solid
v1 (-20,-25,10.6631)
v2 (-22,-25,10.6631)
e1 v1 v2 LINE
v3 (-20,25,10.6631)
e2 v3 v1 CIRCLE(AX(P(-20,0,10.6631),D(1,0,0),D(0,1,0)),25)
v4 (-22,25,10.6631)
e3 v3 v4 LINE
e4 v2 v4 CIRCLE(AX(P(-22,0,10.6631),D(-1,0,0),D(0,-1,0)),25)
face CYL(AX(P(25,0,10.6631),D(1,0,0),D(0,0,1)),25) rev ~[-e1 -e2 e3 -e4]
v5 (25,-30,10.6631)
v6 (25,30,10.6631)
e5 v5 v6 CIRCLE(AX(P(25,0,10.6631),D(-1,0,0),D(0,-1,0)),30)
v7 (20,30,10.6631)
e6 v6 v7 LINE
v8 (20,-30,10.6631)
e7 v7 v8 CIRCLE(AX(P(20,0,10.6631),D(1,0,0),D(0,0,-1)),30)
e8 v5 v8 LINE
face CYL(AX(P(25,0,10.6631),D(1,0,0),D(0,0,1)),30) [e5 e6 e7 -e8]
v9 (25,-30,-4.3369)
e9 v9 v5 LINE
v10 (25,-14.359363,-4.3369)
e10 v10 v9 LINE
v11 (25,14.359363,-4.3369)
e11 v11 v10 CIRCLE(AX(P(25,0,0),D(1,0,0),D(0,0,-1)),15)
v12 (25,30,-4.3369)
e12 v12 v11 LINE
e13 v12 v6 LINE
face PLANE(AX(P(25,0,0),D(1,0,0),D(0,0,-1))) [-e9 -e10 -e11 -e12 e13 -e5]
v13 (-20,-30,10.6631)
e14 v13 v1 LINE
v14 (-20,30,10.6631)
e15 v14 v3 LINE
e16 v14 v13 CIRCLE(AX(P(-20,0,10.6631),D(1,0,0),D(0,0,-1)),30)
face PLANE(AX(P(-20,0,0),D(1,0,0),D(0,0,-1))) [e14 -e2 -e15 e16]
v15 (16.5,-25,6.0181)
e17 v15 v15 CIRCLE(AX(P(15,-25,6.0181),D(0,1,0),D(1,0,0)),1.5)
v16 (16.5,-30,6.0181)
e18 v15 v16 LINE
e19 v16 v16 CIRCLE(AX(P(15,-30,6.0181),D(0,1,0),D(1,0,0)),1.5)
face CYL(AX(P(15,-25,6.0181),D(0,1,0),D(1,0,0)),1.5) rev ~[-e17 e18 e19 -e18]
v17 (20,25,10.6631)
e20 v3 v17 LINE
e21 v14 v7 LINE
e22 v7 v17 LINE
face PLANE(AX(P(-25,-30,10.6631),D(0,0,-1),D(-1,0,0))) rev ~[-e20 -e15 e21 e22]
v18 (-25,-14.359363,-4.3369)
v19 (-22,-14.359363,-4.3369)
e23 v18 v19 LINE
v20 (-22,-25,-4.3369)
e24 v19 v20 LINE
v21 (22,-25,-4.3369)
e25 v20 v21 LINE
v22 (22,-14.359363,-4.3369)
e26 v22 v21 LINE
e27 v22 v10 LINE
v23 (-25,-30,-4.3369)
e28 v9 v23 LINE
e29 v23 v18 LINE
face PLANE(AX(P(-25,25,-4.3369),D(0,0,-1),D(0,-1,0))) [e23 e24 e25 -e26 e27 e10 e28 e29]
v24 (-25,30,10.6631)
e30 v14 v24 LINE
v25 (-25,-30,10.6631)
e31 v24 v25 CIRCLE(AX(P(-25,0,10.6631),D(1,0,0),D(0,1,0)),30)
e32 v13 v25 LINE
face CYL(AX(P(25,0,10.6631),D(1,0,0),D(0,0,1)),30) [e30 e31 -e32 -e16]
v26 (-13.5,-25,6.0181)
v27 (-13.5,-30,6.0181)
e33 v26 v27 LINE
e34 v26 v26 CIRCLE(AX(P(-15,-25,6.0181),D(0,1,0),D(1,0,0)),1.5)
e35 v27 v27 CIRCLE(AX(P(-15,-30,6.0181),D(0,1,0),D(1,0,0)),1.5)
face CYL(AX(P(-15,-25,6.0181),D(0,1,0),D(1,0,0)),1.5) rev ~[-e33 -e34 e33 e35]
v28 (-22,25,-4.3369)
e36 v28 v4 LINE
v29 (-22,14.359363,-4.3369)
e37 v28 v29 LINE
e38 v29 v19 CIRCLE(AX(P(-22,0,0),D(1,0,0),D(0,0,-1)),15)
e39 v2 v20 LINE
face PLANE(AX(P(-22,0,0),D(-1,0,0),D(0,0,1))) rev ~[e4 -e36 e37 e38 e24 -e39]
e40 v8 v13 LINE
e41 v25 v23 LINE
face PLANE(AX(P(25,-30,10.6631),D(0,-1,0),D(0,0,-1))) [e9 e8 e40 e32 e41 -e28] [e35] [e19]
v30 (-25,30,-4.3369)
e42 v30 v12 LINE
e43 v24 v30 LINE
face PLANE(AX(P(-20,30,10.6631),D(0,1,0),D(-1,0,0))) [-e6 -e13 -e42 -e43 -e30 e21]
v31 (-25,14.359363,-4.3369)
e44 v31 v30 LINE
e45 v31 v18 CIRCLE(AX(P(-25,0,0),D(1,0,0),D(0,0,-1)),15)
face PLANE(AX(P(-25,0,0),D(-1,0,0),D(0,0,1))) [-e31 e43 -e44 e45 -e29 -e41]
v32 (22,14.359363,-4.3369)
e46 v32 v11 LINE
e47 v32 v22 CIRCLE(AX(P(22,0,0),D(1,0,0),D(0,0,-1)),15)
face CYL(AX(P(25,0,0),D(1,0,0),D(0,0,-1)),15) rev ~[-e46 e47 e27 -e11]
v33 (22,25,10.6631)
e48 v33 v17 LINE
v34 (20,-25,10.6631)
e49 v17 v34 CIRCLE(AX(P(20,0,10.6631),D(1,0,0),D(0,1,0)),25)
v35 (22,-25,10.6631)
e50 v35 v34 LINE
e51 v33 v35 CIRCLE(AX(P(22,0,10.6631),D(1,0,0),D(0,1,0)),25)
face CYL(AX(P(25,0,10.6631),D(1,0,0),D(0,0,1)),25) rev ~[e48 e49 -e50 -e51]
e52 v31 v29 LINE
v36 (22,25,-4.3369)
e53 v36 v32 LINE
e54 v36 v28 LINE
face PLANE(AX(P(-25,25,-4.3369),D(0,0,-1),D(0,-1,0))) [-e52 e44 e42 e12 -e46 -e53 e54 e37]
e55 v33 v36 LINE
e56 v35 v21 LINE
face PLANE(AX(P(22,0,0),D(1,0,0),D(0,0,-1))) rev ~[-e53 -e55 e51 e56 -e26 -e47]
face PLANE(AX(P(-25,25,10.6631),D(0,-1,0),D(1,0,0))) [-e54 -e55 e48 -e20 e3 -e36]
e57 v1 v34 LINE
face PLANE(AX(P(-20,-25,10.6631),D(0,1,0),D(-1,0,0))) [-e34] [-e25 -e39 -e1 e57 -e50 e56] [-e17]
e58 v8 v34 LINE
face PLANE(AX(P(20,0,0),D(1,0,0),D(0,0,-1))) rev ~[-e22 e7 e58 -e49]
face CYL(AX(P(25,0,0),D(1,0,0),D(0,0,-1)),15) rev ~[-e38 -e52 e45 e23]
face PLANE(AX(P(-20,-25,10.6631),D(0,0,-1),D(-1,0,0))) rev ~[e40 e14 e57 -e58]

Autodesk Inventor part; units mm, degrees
ref_plane "YZ Plane" through (0, 0, 0) normal (1, 0, 0) x (0, 1, 0)
ref_plane "XZ Plane" through (0, 0, 0) normal (0, 1, 0) x (-1, 0, 0)
sketch "Szkic1" plane through (0, 0, 0) normal (0, 0, 1) x (1, 0, 0)
  line L0 (19.3649, 0) -> (-19.3649, 0)
  line L1 (-19.3649, 0) -> (-103.6215, 0)
  line L2 (-103.6215, 0) -> (-125, 0)
  line L3 (-125, 0) -> (-103.6215, 0)
  line L4 (-103.6215, 0) -> (-19.3649, 0)
  line L5 (-19.3649, 0) -> (19.3649, 0)
  line L6 (19.3649, 0) -> (103.6215, 0)
  line L7 (103.6215, 0) -> (125, 0)
  line L8 (125, 0) -> (103.6215, 0)
  line L9 (103.6215, 0) -> (19.3649, 0)
  line L10 (45, 0) -> (-45, 0)
  line L11 (45, 0) -> (105.3748, 0)
  line L12 (105.3748, 0) -> (130.0712, 0)
  line L13 (130.0712, 0) -> (105.3748, 0)
  line L14 (105.3748, 0) -> (-20.2973, 0)
  line L15 (-20.2973, 0) -> (-105.3748, 0)
  line L16 (-105.3748, 0) -> (-105.3748, 0)
  line L17 (-105.3748, 0) -> (-130.0712, 0)
  line L18 (-130.0712, 0) -> (-105.3748, 0)
  line L19 (-105.3748, 0) -> (-45, 0)
  arc A0 (119.2902, -19.1594) -> (125, 0) centre (90, 0) ccw
  arc A1 (19.3649, -35) -> (103.6215, -25.7743) centre (42.8262, 140.0954) ccw
  arc A2 (103.6215, -25.7743) -> (125, 0) centre (91.4189, 6.1005) ccw
  arc A3 (20.2973, -40.1624) -> (105.3748, -30.457) centre (42.8262, 140.0954) ccw
  arc A4 (105.3748, -30.457) -> (130.0712, 0) centre (91.4189, 6.1005) ccw
  arc A5 (-125, 0) -> (-103.6215, -25.7743) centre (-91.4189, 6.1005) ccw
  arc A6 (-130.0712, 0) -> (-105.3748, -30.457) centre (-91.4189, 6.1005) ccw
  arc A7 (-98.4086, -33.9749) -> (-78.2644, -32.9739) centre (-90, 0) ccw
  arc A8 (-103.6215, -25.7743) -> (-19.3649, -35) centre (-42.8262, 140.0954) ccw
  arc A9 (-19.3649, -35) -> (19.3649, -35) centre (0, 0) ccw
  arc A10 (-20.2973, -40.1624) -> (20.2973, -40.1624) centre (0, 0) ccw
  arc A11 (-105.3748, -30.457) -> (-20.2973, -40.1624) centre (-42.8262, 140.0954) ccw
  line L20 (-105.3748, 0) -> (-20.2973, 0)
  line L21 (19.3649, 0) -> (-19.3649, 0)
  line L22 (130.0712, 0) -> (-130.0712, 0)
  point P0 (0, 0)
  point P1 (-119.2902, -19.1594)
  point P2 (-125, 0)
  point P3 (125, 0)
  dimension "d0" = 70
  dimension "d1" = 70
  dimension "d2" = 250
  dimension "d3" = 90
revolve "Obrót1" add sketch "Szkic1" angle 180 about axis through (130.0712, 0, 0) along (-1, 0, 0) contours L12 A4 A3 A10 A11 A7 A8 A9 A1 A2 | A5 A8 A7 A11 A6 L17
sketch "Szkic2" plane through (0, 0, 0) normal (0, 1, 0) x (-1, 0, 0)
  line L0 (-25, 45) -> (25, 45)
  line L1 (25, 45) -> (25, 15)
  line L2 (25, 15) -> (-25, 15)
  line L3 (-25, 15) -> (-25, 45)
  line L4 (-20.2973, 0) -> (20.2973, 0) projected
  arc A0 (105.3748, 30.457) -> (20.2973, 40.1624) centre (42.8262, -140.0954) ccw projected
  arc A1 (20.2973, 40.1624) -> (-20.2973, 40.1624) centre (0, 0) ccw projected
  point P0 (0, 0)
  point P1 (0, 45)
  point P2 (0, 0)
  point P3 (0, 45)
  dimension "d5" = 50
  dimension "d6" = 30
extrude "Wyciągnięcie proste1" cut sketch "Szkic2" along normal mid plane 91
sketch "Szkic3" plane through (25, 0, 0) normal (-1, 0, 0) x (0, 0, 1)
  point P0 (0, 0)
sketch "Szkic4" plane through (25, 0, 0) normal (-1, 0, 0) x (0, 0, 1)
  arc A0 (15, -37.8222) -> (15, 37.8222) centre (0, 0) ccw projected
  line L0 (15, 37.8222) -> (15, 32.3552) projected
  arc A1 (15, -32.3552) -> (15, 32.3552) centre (0, 0) ccw projected
  line L1 (15, -32.3552) -> (15, -37.8222) projected
  circle A2 centre (10.6631, 0) radius 25
  arc A3 (15, -32.3552) -> (15, 32.3552) centre (0, 0) ccw projected
  circle A4 centre (10.6631, 0) radius 30
  point P0 (0, 0)
  point P1 (35.6631, 0)
  point P2 (22.7682, 27.4494)
  point P3 (22.7682, -27.4494)
  point P4 (35.6631, 0)
  dimension "d9" = 50
  dimension "d19" = 60
extrude "Wyciągnięcie proste2" add sketch "Szkic4" along normal blind 50 contours A4 A1 | A1 A4
sketch "Szkic5" plane through (25, 0, 10.6631) normal (1, 0, 0) x (0, 0, -1)
  arc A0 (-12.1051, -27.4494) -> (-12.1051, 27.4494) centre (0, 0) ccw projected
  circle A1 centre (0, 0) radius 25 projected
  line L0 (0, 25) -> (0, 30)
  line L1 (0, -25) -> (0, -30)
  point P0 (10.6631, 0)
  point P1 (-12.0349, 27.5074)
  point P2 (-12.0349, -27.5074)
  point P3 (-25, 0)
extrude "Wyciągnięcie proste3" cut sketch "Szkic5" against normal blind 50 contours L1 A1 L0 A0
ref_plane "Płaszczyzna konstrukcyjna1" through (0, 0, 0) normal (1, 0, 0) x (0, 0, -1)
sketch "Szkic7" plane through (0, 0, 0) normal (1, 0, 0) x (0, 0, -1)
  arc A0 (-10.6631, 25) -> (-35.6631, 0) centre (-10.6631, 0) ccw projected
  circle A1 centre (-10.6631, 0) radius 25
  circle A2 centre (-10.6631, 0) radius 30
  point P0 (0, 0)
  point P1 (-35.6631, 0)
  dimension "d16" = 5
extrude "Wyciągnięcie proste4" cut sketch "Szkic7" along normal mid plane 40
sketch "Szkic8" plane through (0, 0, 0) normal (1, 0, 0) x (0, 0, -1)
  point P0 (0, 0)
sketch "Szkic9" plane through (-25, -30, 10.6631) normal (0, 0, -1) x (-1, 0, 0)
  line L0 (-5, 5) -> (-5, 0) projected
  line L1 (0, 0) -> (-5, 0) projected
  line L2 (0, 5) -> (0, 0) projected
  line L3 (-5, 5) -> (0, 5) projected
  line L4 (-45, 0) -> (-45, 5) projected
  line L5 (-50, 5) -> (-45, 5) projected
  line L6 (-50, 0) -> (-50, 5) projected
  line L7 (-45, 0) -> (-50, 0) projected
  line L8 (-5, 60) -> (-5, 55) projected
  line L9 (0, 55) -> (-5, 55) projected
  line L10 (0, 60) -> (0, 55) projected
  line L11 (-5, 60) -> (0, 60) projected
  line L12 (-45, 55) -> (-45, 60) projected
  line L13 (-50, 60) -> (-45, 60) projected
  line L14 (-50, 55) -> (-50, 60) projected
  line L15 (-45, 55) -> (-50, 55) projected
  line L16 (0, 55) -> (-50, 55)
  line L17 (-50, 60) -> (0, 60)
  line L18 (0, 0) -> (0, 5)
  line L19 (-50, 5) -> (-50, 0)
  line L20 (0, 5) -> (-50, 5)
  line L21 (0, 0) -> (-50, 0)
  point P0 (-25, 30)
extrude "Wyciągnięcie proste5" add sketch "Szkic9" along normal blind 10
sketch "Szkic10" plane through (-20, 30, 10.6631) normal (0, 1, 0) x (1, 0, 0)
  line L0 (0, 0) -> (-5, 0) projected
  line L1 (0, 0) -> (40, 0) projected
  line L2 (45, 0) -> (40, 0) projected
  line L3 (45, 0) -> (45, 10) projected
  line L4 (-5, 10) -> (45, 10) projected
  line L5 (-5, 0) -> (-5, 10) projected
  point P0 (20, 10.6631)
sketch "Szkic15" plane through (-25, -30, 0.6631) normal (0, 0, -1) x (-1, 0, 0)
  line L0 (-50, 60) -> (-50, 55) projected
  line L1 (-50, 60) -> (-0.0556, 60)
  line L2 (-0.0556, 60) -> (-0.0556, 70)
  line L3 (-0.0556, 70) -> (-50, 70)
  line L4 (-50, 70) -> (-50, 60)
  line L5 (0, 55) -> (0, 60) projected
  arc A0 (-5.6351, 65) -> (-44.3649, 65) centre (-25, 30) ccw projected
  point P0 (-25, 30)
  point P1 (-25.0278, 70)
  point P2 (-25, 70)
extrude "Wyciągnięcie proste6" add sketch "Szkic15" against normal blind 3
sketch "Szkic18" plane through (-20, -25, 10.6631) normal (0, 1, 0) x (1, 0, 0)
  line L0 (0, 0) -> (-5, 0) projected
  line L1 (0, 0) -> (40, 0) projected
  line L2 (45, 0) -> (40, 0) projected
  line L3 (45, 0) -> (45, 10) projected
  line L4 (-5, 10) -> (45, 10) projected
  line L5 (-5, 0) -> (-5, 10) projected
  point P0 (20, 10.6631)
extrude "Wyciągnięcie proste9" add sketch "Szkic18" against normal blind 13.5
sketch "Szkic19" plane through (0, 0, 0) normal (0, 0, -1) x (-1, 0, 0)
  arc A0 (-130.0712, 0) -> (-105.3748, -30.457) centre (-91.4189, 6.1005) ccw projected
  arc A1 (-105.3748, -30.457) -> (-20.2973, -40.1624) centre (-42.8262, 140.0954) ccw projected
  arc A2 (-20.2973, -40.1624) -> (20.2973, -40.1624) centre (0, 0) ccw projected
  arc A3 (20.2973, -40.1624) -> (105.3748, -30.457) centre (42.8262, 140.0954) ccw projected
  arc A4 (105.3748, -30.457) -> (130.0712, 0) centre (91.4189, 6.1005) ccw projected
  arc A5 (130.0712, 0) -> (105.3748, 30.457) centre (91.4189, -6.1005) ccw projected
  arc A6 (105.3748, 30.457) -> (20.2973, 40.1624) centre (42.8262, -140.0954) ccw projected
  arc A7 (20.2973, 40.1624) -> (-20.2973, 40.1624) centre (0, 0) ccw projected
  arc A8 (-20.2973, 40.1624) -> (-105.3748, 30.457) centre (-42.8262, -140.0954) ccw projected
  arc A9 (-105.3748, 30.457) -> (-130.0712, 0) centre (-91.4189, -6.1005) ccw projected
  arc A10 (-103.6215, 25.7743) -> (-125, 0) centre (-91.4189, -6.1005) ccw projected
  arc A11 (-19.3649, 35) -> (-103.6215, 25.7743) centre (-42.8262, -140.0954) ccw projected
  arc A12 (19.3649, 35) -> (-19.3649, 35) centre (0, 0) ccw projected
  arc A13 (103.6215, 25.7743) -> (19.3649, 35) centre (42.8262, -140.0954) ccw projected
  arc A14 (125, 0) -> (103.6215, 25.7743) centre (91.4189, -6.1005) ccw projected
  arc A15 (103.6215, -25.7743) -> (125, 0) centre (91.4189, 6.1005) ccw projected
  arc A16 (19.3649, -35) -> (103.6215, -25.7743) centre (42.8262, 140.0954) ccw projected
  arc A17 (-19.3649, -35) -> (19.3649, -35) centre (0, 0) ccw projected
  arc A18 (-103.6215, -25.7743) -> (-19.3649, -35) centre (-42.8262, 140.0954) ccw projected
  arc A19 (-125, 0) -> (-103.6215, -25.7743) centre (-91.4189, 6.1005) ccw projected
  line L0 (-130.0712, 0) -> (130.0712, 0)
  line L1 (-25, 34.6933) -> (-25, -34.6933) projected
  line L2 (-25, 34.6933) -> (-25, 40.6881)
  line L3 (-25, -34.6933) -> (-25, -40.6881)
  line L4 (25, -27.4494) -> (25, 27.4494) projected
  line L5 (25, 27.4494) -> (25, 40.6881)
  line L6 (25, -27.4494) -> (25, -40.6881)
  point P0 (0, 0)
  point P1 (25, 35.6631)
  point P2 (125, 0)
  point P3 (-125, 0)
  point P4 (-25, 35.6631)
  point P5 (-25, 37.8222)
  point P6 (-25, -37.8222)
revolve "Obrót4" cut sketch "Szkic19" angle 360 about axis through (130.0712, 0, 0) along (-1, 0, 0) contours A9 A8 L2 A11 A10 L0 | A14 A13 L5 A6 A5 L0
sketch "Szkic20" plane through (0, 0, 0) normal (0, 0, -1) x (-1, 0, 0)
  line L0 (25, -40.6881) -> (25, -35.6631) projected
  arc A0 (25, 40.6881) -> (20.2973, 40.1624) centre (42.8262, -140.0954) ccw projected
  arc A1 (20.2973, 40.1624) -> (-20.2973, 40.1624) centre (0, 0) ccw projected
  arc A2 (-20.2973, 40.1624) -> (-25, 40.6881) centre (-42.8262, -140.0954) ccw projected
  line L1 (-25, 40.6881) -> (-25, 35.6631) projected
  arc A3 (-19.3649, 35) -> (-25, 35.6631) centre (-42.8262, -140.0954) ccw projected
  arc A4 (19.3649, 35) -> (-19.3649, 35) centre (0, 0) ccw projected
  arc A5 (25, 35.6631) -> (19.3649, 35) centre (42.8262, -140.0954) ccw projected
  line L2 (25, -27.4494) -> (25, 27.4494) projected
  line L3 (25, 0) -> (-25, 0)
  arc A6 (19.3649, -35) -> (25, -35.6631) centre (42.8262, 140.0954) ccw projected
  arc A7 (-19.3649, -35) -> (19.3649, -35) centre (0, 0) ccw projected
  arc A8 (-25, -35.6631) -> (-19.3649, -35) centre (-42.8262, 140.0954) ccw projected
  line L4 (-25, -35.6631) -> (-25, -40.6881) projected
  arc A9 (-25, -40.6881) -> (-20.2973, -40.1624) centre (-42.8262, 140.0954) ccw projected
  arc A10 (-20.2973, -40.1624) -> (20.2973, -40.1624) centre (0, 0) ccw projected
  arc A11 (20.2973, -40.1624) -> (25, -40.6881) centre (42.8262, 140.0954) ccw projected
  line L5 (25, 35.6631) -> (25, 40.6881) projected
  point P0 (0, 0)
  point P1 (25, 30)
  point P2 (25, -30)
revolve "Obrót5" cut sketch "Szkic20" angle 30 about axis through (-25, 0, 0) along (1, 0, 0) contours L5 A5 A4 A3 L1 A2 A1 A0
sketch "Szkic23" plane through (0, 0, 0) normal (0, 0, -1) x (-1, 0, 0)
  line L0 (25, -40.6881) -> (25, -35.6631) projected
  arc A0 (19.3649, -35) -> (25, -35.6631) centre (42.8262, 140.0954) ccw projected
  arc A1 (-19.3649, -35) -> (19.3649, -35) centre (0, 0) ccw projected
  arc A2 (-25, -35.6631) -> (-19.3649, -35) centre (-42.8262, 140.0954) ccw projected
  line L1 (-25, -35.6631) -> (-25, -40.6881) projected
  arc A3 (-25, -40.6881) -> (-20.2973, -40.1624) centre (-42.8262, 140.0954) ccw projected
  arc A4 (-20.2973, -40.1624) -> (20.2973, -40.1624) centre (0, 0) ccw projected
  arc A5 (20.2973, -40.1624) -> (25, -40.6881) centre (42.8262, 140.0954) ccw projected
  line L2 (0, 0) -> (-25.9666, 0)
  point P0 (0, 0)
revolve "Obrót6" cut sketch "Szkic23" angle 30 about axis through (0, 0, 0) along (-1, 0, 0)
sketch "Szkic24" plane through (25, 0, 0) normal (1, 0, 0) x (0, 0, -1)
  arc A0 (-10.6631, -34.0317) -> (-0.6631, -35.657) centre (0, 0) ccw projected
  line L0 (-0.6631, -25) -> (-0.6631, -35.657) projected
  line L1 (-10.6631, -25) -> (-0.6631, -25) projected
  arc A1 (-10.6631, 25) -> (-10.6631, -25) centre (-10.6631, 0) ccw projected
  line L2 (-10.6631, 25) -> (-0.6631, 25) projected
  line L3 (-0.6631, 35.657) -> (-0.6631, 25) projected
  arc A2 (-0.6631, 35.657) -> (-3.6631, 35.4745) centre (0, 0) ccw projected
  line L4 (-3.6631, 30) -> (-3.6631, 35.4745) projected
  line L5 (-10.6631, 30) -> (-3.6631, 30) projected
  arc A3 (-10.6631, 30) -> (-10.6631, -30) centre (-10.6631, 0) ccw projected
  line L6 (-10.6631, -30) -> (-10.6631, -34.0317) projected
  line L7 (-10.6631, -30) -> (-0.6631, -30)
  line L8 (-10.6631, 30) -> (-10.6631, 45.858)
  line L9 (-10.6631, 45.858) -> (14.375, 45.858)
  line L10 (14.375, 45.858) -> (14.375, -45.1514)
  line L11 (14.375, -45.1514) -> (-20.0352, -45.1514)
  line L12 (-10.6631, -30) -> (-10.6631, -34.0317) projected
  line L13 (-20.0352, -45.1514) -> (-10.6631, -30)
  line L14 (-10.6631, 30) -> (-0.6631, 30)
  line L15 (-10.6631, 25) -> (-0.6631, 25) projected
  line L16 (-0.6631, 25) -> (-10.6631, 25)
  point P0 (0, 0)
extrude "Wyciągnięcie proste10" cut sketch "Szkic24" against normal blind 61.5 contours L6 L7 L0 A0 | A0 L0 L1 A1 L2 L3 A2 L4 L5 L8 L9 L10 L11 L13 L6 | L4 A2 L3 L14
sketch "Szkic25" plane through (-20, -25, 10.6631) normal (0, 1, 0) x (1, 0, 0)
  circle A0 centre (35, 4.645) radius 1.5
  circle A1 centre (5, 4.645) radius 1.5
  line L0 (45, 0) -> (45, 10) projected
  point P0 (20, 10.6631)
  dimension "d38" = 3
  dimension "d39" = 3
  dimension "d40" = 10
  dimension "d41" = 30
extrude "Wyciągnięcie proste11" cut sketch "Szkic25" against normal blind 61.5
sketch "Szkic26" plane through (-25, -30, 0.6631) normal (0, 0, -1) x (-1, 0, 0)
  point P0 (-25, 30)
sketch "Szkic27" plane through (-25, -30, 0.6631) normal (0, 0, -1) x (-1, 0, 0)
  line L0 (0, 60) -> (-50, 60) projected
  line L1 (-50, 60) -> (-50, 55) projected
  line L2 (-50, 55) -> (0, 55) projected
  line L3 (0, 55) -> (0, 60) projected
  line L4 (-50, 0) -> (0, 0) projected
  line L5 (0, 5) -> (0, 0) projected
  line L6 (0, 5) -> (-50, 5) projected
  line L7 (-50, 5) -> (-50, 0) projected
  point P0 (-25, 30)
extrude "Wyciągnięcie proste12" add sketch "Szkic27" along normal blind 5
sketch "Szkic28" plane through (25, 0, 0) normal (1, 0, 0) x (0, 0, -1)
  line L0 (-10.6631, -30) -> (4.3369, -30) projected
  line L1 (4.3369, -25) -> (4.3369, -30) projected
  line L2 (-10.6631, -25) -> (4.3369, -25) projected
  arc A0 (-10.6631, 25) -> (-10.6631, -25) centre (-10.6631, 0) ccw projected
  line L3 (-10.6631, 25) -> (4.3369, 25) projected
  line L4 (4.3369, 30) -> (4.3369, 25) projected
  line L5 (-10.6631, 30) -> (4.3369, 30) projected
  arc A1 (-10.6631, 30) -> (-10.6631, -30) centre (-10.6631, 0) ccw projected
  line L6 (4.3369, 25) -> (4.3369, -25)
  point P0 (0, 0)
extrude "Wyciągnięcie proste13" add sketch "Szkic28" against normal blind 3 contours L2 A0 L3 L6
sketch "Szkic29" plane through (-25, 0, 0) normal (-1, 0, 0) x (0, 0, 1)
  line L0 (10.6631, -25) -> (-4.3369, -25) projected
  arc A0 (10.6631, -25) -> (10.6631, 25) centre (10.6631, 0) ccw projected
  line L1 (-4.3369, 25) -> (10.6631, 25) projected
  line L2 (-4.3369, 25) -> (-4.3369, -25) projected
  point P0 (0, 0)
extrude "Wyciągnięcie proste14" add sketch "Szkic29" against normal blind 3
sketch "Szkic30" plane through (25, 0, 0) normal (1, 0, 0) x (0, 0, -1)
  circle A0 centre (0, 0) radius 15
  dimension "d50" = 30
extrude "Wyciągnięcie proste15" cut sketch "Szkic30" against normal blind 71
properties part number "przód2" material "Tworzywo sztuczne PET"
